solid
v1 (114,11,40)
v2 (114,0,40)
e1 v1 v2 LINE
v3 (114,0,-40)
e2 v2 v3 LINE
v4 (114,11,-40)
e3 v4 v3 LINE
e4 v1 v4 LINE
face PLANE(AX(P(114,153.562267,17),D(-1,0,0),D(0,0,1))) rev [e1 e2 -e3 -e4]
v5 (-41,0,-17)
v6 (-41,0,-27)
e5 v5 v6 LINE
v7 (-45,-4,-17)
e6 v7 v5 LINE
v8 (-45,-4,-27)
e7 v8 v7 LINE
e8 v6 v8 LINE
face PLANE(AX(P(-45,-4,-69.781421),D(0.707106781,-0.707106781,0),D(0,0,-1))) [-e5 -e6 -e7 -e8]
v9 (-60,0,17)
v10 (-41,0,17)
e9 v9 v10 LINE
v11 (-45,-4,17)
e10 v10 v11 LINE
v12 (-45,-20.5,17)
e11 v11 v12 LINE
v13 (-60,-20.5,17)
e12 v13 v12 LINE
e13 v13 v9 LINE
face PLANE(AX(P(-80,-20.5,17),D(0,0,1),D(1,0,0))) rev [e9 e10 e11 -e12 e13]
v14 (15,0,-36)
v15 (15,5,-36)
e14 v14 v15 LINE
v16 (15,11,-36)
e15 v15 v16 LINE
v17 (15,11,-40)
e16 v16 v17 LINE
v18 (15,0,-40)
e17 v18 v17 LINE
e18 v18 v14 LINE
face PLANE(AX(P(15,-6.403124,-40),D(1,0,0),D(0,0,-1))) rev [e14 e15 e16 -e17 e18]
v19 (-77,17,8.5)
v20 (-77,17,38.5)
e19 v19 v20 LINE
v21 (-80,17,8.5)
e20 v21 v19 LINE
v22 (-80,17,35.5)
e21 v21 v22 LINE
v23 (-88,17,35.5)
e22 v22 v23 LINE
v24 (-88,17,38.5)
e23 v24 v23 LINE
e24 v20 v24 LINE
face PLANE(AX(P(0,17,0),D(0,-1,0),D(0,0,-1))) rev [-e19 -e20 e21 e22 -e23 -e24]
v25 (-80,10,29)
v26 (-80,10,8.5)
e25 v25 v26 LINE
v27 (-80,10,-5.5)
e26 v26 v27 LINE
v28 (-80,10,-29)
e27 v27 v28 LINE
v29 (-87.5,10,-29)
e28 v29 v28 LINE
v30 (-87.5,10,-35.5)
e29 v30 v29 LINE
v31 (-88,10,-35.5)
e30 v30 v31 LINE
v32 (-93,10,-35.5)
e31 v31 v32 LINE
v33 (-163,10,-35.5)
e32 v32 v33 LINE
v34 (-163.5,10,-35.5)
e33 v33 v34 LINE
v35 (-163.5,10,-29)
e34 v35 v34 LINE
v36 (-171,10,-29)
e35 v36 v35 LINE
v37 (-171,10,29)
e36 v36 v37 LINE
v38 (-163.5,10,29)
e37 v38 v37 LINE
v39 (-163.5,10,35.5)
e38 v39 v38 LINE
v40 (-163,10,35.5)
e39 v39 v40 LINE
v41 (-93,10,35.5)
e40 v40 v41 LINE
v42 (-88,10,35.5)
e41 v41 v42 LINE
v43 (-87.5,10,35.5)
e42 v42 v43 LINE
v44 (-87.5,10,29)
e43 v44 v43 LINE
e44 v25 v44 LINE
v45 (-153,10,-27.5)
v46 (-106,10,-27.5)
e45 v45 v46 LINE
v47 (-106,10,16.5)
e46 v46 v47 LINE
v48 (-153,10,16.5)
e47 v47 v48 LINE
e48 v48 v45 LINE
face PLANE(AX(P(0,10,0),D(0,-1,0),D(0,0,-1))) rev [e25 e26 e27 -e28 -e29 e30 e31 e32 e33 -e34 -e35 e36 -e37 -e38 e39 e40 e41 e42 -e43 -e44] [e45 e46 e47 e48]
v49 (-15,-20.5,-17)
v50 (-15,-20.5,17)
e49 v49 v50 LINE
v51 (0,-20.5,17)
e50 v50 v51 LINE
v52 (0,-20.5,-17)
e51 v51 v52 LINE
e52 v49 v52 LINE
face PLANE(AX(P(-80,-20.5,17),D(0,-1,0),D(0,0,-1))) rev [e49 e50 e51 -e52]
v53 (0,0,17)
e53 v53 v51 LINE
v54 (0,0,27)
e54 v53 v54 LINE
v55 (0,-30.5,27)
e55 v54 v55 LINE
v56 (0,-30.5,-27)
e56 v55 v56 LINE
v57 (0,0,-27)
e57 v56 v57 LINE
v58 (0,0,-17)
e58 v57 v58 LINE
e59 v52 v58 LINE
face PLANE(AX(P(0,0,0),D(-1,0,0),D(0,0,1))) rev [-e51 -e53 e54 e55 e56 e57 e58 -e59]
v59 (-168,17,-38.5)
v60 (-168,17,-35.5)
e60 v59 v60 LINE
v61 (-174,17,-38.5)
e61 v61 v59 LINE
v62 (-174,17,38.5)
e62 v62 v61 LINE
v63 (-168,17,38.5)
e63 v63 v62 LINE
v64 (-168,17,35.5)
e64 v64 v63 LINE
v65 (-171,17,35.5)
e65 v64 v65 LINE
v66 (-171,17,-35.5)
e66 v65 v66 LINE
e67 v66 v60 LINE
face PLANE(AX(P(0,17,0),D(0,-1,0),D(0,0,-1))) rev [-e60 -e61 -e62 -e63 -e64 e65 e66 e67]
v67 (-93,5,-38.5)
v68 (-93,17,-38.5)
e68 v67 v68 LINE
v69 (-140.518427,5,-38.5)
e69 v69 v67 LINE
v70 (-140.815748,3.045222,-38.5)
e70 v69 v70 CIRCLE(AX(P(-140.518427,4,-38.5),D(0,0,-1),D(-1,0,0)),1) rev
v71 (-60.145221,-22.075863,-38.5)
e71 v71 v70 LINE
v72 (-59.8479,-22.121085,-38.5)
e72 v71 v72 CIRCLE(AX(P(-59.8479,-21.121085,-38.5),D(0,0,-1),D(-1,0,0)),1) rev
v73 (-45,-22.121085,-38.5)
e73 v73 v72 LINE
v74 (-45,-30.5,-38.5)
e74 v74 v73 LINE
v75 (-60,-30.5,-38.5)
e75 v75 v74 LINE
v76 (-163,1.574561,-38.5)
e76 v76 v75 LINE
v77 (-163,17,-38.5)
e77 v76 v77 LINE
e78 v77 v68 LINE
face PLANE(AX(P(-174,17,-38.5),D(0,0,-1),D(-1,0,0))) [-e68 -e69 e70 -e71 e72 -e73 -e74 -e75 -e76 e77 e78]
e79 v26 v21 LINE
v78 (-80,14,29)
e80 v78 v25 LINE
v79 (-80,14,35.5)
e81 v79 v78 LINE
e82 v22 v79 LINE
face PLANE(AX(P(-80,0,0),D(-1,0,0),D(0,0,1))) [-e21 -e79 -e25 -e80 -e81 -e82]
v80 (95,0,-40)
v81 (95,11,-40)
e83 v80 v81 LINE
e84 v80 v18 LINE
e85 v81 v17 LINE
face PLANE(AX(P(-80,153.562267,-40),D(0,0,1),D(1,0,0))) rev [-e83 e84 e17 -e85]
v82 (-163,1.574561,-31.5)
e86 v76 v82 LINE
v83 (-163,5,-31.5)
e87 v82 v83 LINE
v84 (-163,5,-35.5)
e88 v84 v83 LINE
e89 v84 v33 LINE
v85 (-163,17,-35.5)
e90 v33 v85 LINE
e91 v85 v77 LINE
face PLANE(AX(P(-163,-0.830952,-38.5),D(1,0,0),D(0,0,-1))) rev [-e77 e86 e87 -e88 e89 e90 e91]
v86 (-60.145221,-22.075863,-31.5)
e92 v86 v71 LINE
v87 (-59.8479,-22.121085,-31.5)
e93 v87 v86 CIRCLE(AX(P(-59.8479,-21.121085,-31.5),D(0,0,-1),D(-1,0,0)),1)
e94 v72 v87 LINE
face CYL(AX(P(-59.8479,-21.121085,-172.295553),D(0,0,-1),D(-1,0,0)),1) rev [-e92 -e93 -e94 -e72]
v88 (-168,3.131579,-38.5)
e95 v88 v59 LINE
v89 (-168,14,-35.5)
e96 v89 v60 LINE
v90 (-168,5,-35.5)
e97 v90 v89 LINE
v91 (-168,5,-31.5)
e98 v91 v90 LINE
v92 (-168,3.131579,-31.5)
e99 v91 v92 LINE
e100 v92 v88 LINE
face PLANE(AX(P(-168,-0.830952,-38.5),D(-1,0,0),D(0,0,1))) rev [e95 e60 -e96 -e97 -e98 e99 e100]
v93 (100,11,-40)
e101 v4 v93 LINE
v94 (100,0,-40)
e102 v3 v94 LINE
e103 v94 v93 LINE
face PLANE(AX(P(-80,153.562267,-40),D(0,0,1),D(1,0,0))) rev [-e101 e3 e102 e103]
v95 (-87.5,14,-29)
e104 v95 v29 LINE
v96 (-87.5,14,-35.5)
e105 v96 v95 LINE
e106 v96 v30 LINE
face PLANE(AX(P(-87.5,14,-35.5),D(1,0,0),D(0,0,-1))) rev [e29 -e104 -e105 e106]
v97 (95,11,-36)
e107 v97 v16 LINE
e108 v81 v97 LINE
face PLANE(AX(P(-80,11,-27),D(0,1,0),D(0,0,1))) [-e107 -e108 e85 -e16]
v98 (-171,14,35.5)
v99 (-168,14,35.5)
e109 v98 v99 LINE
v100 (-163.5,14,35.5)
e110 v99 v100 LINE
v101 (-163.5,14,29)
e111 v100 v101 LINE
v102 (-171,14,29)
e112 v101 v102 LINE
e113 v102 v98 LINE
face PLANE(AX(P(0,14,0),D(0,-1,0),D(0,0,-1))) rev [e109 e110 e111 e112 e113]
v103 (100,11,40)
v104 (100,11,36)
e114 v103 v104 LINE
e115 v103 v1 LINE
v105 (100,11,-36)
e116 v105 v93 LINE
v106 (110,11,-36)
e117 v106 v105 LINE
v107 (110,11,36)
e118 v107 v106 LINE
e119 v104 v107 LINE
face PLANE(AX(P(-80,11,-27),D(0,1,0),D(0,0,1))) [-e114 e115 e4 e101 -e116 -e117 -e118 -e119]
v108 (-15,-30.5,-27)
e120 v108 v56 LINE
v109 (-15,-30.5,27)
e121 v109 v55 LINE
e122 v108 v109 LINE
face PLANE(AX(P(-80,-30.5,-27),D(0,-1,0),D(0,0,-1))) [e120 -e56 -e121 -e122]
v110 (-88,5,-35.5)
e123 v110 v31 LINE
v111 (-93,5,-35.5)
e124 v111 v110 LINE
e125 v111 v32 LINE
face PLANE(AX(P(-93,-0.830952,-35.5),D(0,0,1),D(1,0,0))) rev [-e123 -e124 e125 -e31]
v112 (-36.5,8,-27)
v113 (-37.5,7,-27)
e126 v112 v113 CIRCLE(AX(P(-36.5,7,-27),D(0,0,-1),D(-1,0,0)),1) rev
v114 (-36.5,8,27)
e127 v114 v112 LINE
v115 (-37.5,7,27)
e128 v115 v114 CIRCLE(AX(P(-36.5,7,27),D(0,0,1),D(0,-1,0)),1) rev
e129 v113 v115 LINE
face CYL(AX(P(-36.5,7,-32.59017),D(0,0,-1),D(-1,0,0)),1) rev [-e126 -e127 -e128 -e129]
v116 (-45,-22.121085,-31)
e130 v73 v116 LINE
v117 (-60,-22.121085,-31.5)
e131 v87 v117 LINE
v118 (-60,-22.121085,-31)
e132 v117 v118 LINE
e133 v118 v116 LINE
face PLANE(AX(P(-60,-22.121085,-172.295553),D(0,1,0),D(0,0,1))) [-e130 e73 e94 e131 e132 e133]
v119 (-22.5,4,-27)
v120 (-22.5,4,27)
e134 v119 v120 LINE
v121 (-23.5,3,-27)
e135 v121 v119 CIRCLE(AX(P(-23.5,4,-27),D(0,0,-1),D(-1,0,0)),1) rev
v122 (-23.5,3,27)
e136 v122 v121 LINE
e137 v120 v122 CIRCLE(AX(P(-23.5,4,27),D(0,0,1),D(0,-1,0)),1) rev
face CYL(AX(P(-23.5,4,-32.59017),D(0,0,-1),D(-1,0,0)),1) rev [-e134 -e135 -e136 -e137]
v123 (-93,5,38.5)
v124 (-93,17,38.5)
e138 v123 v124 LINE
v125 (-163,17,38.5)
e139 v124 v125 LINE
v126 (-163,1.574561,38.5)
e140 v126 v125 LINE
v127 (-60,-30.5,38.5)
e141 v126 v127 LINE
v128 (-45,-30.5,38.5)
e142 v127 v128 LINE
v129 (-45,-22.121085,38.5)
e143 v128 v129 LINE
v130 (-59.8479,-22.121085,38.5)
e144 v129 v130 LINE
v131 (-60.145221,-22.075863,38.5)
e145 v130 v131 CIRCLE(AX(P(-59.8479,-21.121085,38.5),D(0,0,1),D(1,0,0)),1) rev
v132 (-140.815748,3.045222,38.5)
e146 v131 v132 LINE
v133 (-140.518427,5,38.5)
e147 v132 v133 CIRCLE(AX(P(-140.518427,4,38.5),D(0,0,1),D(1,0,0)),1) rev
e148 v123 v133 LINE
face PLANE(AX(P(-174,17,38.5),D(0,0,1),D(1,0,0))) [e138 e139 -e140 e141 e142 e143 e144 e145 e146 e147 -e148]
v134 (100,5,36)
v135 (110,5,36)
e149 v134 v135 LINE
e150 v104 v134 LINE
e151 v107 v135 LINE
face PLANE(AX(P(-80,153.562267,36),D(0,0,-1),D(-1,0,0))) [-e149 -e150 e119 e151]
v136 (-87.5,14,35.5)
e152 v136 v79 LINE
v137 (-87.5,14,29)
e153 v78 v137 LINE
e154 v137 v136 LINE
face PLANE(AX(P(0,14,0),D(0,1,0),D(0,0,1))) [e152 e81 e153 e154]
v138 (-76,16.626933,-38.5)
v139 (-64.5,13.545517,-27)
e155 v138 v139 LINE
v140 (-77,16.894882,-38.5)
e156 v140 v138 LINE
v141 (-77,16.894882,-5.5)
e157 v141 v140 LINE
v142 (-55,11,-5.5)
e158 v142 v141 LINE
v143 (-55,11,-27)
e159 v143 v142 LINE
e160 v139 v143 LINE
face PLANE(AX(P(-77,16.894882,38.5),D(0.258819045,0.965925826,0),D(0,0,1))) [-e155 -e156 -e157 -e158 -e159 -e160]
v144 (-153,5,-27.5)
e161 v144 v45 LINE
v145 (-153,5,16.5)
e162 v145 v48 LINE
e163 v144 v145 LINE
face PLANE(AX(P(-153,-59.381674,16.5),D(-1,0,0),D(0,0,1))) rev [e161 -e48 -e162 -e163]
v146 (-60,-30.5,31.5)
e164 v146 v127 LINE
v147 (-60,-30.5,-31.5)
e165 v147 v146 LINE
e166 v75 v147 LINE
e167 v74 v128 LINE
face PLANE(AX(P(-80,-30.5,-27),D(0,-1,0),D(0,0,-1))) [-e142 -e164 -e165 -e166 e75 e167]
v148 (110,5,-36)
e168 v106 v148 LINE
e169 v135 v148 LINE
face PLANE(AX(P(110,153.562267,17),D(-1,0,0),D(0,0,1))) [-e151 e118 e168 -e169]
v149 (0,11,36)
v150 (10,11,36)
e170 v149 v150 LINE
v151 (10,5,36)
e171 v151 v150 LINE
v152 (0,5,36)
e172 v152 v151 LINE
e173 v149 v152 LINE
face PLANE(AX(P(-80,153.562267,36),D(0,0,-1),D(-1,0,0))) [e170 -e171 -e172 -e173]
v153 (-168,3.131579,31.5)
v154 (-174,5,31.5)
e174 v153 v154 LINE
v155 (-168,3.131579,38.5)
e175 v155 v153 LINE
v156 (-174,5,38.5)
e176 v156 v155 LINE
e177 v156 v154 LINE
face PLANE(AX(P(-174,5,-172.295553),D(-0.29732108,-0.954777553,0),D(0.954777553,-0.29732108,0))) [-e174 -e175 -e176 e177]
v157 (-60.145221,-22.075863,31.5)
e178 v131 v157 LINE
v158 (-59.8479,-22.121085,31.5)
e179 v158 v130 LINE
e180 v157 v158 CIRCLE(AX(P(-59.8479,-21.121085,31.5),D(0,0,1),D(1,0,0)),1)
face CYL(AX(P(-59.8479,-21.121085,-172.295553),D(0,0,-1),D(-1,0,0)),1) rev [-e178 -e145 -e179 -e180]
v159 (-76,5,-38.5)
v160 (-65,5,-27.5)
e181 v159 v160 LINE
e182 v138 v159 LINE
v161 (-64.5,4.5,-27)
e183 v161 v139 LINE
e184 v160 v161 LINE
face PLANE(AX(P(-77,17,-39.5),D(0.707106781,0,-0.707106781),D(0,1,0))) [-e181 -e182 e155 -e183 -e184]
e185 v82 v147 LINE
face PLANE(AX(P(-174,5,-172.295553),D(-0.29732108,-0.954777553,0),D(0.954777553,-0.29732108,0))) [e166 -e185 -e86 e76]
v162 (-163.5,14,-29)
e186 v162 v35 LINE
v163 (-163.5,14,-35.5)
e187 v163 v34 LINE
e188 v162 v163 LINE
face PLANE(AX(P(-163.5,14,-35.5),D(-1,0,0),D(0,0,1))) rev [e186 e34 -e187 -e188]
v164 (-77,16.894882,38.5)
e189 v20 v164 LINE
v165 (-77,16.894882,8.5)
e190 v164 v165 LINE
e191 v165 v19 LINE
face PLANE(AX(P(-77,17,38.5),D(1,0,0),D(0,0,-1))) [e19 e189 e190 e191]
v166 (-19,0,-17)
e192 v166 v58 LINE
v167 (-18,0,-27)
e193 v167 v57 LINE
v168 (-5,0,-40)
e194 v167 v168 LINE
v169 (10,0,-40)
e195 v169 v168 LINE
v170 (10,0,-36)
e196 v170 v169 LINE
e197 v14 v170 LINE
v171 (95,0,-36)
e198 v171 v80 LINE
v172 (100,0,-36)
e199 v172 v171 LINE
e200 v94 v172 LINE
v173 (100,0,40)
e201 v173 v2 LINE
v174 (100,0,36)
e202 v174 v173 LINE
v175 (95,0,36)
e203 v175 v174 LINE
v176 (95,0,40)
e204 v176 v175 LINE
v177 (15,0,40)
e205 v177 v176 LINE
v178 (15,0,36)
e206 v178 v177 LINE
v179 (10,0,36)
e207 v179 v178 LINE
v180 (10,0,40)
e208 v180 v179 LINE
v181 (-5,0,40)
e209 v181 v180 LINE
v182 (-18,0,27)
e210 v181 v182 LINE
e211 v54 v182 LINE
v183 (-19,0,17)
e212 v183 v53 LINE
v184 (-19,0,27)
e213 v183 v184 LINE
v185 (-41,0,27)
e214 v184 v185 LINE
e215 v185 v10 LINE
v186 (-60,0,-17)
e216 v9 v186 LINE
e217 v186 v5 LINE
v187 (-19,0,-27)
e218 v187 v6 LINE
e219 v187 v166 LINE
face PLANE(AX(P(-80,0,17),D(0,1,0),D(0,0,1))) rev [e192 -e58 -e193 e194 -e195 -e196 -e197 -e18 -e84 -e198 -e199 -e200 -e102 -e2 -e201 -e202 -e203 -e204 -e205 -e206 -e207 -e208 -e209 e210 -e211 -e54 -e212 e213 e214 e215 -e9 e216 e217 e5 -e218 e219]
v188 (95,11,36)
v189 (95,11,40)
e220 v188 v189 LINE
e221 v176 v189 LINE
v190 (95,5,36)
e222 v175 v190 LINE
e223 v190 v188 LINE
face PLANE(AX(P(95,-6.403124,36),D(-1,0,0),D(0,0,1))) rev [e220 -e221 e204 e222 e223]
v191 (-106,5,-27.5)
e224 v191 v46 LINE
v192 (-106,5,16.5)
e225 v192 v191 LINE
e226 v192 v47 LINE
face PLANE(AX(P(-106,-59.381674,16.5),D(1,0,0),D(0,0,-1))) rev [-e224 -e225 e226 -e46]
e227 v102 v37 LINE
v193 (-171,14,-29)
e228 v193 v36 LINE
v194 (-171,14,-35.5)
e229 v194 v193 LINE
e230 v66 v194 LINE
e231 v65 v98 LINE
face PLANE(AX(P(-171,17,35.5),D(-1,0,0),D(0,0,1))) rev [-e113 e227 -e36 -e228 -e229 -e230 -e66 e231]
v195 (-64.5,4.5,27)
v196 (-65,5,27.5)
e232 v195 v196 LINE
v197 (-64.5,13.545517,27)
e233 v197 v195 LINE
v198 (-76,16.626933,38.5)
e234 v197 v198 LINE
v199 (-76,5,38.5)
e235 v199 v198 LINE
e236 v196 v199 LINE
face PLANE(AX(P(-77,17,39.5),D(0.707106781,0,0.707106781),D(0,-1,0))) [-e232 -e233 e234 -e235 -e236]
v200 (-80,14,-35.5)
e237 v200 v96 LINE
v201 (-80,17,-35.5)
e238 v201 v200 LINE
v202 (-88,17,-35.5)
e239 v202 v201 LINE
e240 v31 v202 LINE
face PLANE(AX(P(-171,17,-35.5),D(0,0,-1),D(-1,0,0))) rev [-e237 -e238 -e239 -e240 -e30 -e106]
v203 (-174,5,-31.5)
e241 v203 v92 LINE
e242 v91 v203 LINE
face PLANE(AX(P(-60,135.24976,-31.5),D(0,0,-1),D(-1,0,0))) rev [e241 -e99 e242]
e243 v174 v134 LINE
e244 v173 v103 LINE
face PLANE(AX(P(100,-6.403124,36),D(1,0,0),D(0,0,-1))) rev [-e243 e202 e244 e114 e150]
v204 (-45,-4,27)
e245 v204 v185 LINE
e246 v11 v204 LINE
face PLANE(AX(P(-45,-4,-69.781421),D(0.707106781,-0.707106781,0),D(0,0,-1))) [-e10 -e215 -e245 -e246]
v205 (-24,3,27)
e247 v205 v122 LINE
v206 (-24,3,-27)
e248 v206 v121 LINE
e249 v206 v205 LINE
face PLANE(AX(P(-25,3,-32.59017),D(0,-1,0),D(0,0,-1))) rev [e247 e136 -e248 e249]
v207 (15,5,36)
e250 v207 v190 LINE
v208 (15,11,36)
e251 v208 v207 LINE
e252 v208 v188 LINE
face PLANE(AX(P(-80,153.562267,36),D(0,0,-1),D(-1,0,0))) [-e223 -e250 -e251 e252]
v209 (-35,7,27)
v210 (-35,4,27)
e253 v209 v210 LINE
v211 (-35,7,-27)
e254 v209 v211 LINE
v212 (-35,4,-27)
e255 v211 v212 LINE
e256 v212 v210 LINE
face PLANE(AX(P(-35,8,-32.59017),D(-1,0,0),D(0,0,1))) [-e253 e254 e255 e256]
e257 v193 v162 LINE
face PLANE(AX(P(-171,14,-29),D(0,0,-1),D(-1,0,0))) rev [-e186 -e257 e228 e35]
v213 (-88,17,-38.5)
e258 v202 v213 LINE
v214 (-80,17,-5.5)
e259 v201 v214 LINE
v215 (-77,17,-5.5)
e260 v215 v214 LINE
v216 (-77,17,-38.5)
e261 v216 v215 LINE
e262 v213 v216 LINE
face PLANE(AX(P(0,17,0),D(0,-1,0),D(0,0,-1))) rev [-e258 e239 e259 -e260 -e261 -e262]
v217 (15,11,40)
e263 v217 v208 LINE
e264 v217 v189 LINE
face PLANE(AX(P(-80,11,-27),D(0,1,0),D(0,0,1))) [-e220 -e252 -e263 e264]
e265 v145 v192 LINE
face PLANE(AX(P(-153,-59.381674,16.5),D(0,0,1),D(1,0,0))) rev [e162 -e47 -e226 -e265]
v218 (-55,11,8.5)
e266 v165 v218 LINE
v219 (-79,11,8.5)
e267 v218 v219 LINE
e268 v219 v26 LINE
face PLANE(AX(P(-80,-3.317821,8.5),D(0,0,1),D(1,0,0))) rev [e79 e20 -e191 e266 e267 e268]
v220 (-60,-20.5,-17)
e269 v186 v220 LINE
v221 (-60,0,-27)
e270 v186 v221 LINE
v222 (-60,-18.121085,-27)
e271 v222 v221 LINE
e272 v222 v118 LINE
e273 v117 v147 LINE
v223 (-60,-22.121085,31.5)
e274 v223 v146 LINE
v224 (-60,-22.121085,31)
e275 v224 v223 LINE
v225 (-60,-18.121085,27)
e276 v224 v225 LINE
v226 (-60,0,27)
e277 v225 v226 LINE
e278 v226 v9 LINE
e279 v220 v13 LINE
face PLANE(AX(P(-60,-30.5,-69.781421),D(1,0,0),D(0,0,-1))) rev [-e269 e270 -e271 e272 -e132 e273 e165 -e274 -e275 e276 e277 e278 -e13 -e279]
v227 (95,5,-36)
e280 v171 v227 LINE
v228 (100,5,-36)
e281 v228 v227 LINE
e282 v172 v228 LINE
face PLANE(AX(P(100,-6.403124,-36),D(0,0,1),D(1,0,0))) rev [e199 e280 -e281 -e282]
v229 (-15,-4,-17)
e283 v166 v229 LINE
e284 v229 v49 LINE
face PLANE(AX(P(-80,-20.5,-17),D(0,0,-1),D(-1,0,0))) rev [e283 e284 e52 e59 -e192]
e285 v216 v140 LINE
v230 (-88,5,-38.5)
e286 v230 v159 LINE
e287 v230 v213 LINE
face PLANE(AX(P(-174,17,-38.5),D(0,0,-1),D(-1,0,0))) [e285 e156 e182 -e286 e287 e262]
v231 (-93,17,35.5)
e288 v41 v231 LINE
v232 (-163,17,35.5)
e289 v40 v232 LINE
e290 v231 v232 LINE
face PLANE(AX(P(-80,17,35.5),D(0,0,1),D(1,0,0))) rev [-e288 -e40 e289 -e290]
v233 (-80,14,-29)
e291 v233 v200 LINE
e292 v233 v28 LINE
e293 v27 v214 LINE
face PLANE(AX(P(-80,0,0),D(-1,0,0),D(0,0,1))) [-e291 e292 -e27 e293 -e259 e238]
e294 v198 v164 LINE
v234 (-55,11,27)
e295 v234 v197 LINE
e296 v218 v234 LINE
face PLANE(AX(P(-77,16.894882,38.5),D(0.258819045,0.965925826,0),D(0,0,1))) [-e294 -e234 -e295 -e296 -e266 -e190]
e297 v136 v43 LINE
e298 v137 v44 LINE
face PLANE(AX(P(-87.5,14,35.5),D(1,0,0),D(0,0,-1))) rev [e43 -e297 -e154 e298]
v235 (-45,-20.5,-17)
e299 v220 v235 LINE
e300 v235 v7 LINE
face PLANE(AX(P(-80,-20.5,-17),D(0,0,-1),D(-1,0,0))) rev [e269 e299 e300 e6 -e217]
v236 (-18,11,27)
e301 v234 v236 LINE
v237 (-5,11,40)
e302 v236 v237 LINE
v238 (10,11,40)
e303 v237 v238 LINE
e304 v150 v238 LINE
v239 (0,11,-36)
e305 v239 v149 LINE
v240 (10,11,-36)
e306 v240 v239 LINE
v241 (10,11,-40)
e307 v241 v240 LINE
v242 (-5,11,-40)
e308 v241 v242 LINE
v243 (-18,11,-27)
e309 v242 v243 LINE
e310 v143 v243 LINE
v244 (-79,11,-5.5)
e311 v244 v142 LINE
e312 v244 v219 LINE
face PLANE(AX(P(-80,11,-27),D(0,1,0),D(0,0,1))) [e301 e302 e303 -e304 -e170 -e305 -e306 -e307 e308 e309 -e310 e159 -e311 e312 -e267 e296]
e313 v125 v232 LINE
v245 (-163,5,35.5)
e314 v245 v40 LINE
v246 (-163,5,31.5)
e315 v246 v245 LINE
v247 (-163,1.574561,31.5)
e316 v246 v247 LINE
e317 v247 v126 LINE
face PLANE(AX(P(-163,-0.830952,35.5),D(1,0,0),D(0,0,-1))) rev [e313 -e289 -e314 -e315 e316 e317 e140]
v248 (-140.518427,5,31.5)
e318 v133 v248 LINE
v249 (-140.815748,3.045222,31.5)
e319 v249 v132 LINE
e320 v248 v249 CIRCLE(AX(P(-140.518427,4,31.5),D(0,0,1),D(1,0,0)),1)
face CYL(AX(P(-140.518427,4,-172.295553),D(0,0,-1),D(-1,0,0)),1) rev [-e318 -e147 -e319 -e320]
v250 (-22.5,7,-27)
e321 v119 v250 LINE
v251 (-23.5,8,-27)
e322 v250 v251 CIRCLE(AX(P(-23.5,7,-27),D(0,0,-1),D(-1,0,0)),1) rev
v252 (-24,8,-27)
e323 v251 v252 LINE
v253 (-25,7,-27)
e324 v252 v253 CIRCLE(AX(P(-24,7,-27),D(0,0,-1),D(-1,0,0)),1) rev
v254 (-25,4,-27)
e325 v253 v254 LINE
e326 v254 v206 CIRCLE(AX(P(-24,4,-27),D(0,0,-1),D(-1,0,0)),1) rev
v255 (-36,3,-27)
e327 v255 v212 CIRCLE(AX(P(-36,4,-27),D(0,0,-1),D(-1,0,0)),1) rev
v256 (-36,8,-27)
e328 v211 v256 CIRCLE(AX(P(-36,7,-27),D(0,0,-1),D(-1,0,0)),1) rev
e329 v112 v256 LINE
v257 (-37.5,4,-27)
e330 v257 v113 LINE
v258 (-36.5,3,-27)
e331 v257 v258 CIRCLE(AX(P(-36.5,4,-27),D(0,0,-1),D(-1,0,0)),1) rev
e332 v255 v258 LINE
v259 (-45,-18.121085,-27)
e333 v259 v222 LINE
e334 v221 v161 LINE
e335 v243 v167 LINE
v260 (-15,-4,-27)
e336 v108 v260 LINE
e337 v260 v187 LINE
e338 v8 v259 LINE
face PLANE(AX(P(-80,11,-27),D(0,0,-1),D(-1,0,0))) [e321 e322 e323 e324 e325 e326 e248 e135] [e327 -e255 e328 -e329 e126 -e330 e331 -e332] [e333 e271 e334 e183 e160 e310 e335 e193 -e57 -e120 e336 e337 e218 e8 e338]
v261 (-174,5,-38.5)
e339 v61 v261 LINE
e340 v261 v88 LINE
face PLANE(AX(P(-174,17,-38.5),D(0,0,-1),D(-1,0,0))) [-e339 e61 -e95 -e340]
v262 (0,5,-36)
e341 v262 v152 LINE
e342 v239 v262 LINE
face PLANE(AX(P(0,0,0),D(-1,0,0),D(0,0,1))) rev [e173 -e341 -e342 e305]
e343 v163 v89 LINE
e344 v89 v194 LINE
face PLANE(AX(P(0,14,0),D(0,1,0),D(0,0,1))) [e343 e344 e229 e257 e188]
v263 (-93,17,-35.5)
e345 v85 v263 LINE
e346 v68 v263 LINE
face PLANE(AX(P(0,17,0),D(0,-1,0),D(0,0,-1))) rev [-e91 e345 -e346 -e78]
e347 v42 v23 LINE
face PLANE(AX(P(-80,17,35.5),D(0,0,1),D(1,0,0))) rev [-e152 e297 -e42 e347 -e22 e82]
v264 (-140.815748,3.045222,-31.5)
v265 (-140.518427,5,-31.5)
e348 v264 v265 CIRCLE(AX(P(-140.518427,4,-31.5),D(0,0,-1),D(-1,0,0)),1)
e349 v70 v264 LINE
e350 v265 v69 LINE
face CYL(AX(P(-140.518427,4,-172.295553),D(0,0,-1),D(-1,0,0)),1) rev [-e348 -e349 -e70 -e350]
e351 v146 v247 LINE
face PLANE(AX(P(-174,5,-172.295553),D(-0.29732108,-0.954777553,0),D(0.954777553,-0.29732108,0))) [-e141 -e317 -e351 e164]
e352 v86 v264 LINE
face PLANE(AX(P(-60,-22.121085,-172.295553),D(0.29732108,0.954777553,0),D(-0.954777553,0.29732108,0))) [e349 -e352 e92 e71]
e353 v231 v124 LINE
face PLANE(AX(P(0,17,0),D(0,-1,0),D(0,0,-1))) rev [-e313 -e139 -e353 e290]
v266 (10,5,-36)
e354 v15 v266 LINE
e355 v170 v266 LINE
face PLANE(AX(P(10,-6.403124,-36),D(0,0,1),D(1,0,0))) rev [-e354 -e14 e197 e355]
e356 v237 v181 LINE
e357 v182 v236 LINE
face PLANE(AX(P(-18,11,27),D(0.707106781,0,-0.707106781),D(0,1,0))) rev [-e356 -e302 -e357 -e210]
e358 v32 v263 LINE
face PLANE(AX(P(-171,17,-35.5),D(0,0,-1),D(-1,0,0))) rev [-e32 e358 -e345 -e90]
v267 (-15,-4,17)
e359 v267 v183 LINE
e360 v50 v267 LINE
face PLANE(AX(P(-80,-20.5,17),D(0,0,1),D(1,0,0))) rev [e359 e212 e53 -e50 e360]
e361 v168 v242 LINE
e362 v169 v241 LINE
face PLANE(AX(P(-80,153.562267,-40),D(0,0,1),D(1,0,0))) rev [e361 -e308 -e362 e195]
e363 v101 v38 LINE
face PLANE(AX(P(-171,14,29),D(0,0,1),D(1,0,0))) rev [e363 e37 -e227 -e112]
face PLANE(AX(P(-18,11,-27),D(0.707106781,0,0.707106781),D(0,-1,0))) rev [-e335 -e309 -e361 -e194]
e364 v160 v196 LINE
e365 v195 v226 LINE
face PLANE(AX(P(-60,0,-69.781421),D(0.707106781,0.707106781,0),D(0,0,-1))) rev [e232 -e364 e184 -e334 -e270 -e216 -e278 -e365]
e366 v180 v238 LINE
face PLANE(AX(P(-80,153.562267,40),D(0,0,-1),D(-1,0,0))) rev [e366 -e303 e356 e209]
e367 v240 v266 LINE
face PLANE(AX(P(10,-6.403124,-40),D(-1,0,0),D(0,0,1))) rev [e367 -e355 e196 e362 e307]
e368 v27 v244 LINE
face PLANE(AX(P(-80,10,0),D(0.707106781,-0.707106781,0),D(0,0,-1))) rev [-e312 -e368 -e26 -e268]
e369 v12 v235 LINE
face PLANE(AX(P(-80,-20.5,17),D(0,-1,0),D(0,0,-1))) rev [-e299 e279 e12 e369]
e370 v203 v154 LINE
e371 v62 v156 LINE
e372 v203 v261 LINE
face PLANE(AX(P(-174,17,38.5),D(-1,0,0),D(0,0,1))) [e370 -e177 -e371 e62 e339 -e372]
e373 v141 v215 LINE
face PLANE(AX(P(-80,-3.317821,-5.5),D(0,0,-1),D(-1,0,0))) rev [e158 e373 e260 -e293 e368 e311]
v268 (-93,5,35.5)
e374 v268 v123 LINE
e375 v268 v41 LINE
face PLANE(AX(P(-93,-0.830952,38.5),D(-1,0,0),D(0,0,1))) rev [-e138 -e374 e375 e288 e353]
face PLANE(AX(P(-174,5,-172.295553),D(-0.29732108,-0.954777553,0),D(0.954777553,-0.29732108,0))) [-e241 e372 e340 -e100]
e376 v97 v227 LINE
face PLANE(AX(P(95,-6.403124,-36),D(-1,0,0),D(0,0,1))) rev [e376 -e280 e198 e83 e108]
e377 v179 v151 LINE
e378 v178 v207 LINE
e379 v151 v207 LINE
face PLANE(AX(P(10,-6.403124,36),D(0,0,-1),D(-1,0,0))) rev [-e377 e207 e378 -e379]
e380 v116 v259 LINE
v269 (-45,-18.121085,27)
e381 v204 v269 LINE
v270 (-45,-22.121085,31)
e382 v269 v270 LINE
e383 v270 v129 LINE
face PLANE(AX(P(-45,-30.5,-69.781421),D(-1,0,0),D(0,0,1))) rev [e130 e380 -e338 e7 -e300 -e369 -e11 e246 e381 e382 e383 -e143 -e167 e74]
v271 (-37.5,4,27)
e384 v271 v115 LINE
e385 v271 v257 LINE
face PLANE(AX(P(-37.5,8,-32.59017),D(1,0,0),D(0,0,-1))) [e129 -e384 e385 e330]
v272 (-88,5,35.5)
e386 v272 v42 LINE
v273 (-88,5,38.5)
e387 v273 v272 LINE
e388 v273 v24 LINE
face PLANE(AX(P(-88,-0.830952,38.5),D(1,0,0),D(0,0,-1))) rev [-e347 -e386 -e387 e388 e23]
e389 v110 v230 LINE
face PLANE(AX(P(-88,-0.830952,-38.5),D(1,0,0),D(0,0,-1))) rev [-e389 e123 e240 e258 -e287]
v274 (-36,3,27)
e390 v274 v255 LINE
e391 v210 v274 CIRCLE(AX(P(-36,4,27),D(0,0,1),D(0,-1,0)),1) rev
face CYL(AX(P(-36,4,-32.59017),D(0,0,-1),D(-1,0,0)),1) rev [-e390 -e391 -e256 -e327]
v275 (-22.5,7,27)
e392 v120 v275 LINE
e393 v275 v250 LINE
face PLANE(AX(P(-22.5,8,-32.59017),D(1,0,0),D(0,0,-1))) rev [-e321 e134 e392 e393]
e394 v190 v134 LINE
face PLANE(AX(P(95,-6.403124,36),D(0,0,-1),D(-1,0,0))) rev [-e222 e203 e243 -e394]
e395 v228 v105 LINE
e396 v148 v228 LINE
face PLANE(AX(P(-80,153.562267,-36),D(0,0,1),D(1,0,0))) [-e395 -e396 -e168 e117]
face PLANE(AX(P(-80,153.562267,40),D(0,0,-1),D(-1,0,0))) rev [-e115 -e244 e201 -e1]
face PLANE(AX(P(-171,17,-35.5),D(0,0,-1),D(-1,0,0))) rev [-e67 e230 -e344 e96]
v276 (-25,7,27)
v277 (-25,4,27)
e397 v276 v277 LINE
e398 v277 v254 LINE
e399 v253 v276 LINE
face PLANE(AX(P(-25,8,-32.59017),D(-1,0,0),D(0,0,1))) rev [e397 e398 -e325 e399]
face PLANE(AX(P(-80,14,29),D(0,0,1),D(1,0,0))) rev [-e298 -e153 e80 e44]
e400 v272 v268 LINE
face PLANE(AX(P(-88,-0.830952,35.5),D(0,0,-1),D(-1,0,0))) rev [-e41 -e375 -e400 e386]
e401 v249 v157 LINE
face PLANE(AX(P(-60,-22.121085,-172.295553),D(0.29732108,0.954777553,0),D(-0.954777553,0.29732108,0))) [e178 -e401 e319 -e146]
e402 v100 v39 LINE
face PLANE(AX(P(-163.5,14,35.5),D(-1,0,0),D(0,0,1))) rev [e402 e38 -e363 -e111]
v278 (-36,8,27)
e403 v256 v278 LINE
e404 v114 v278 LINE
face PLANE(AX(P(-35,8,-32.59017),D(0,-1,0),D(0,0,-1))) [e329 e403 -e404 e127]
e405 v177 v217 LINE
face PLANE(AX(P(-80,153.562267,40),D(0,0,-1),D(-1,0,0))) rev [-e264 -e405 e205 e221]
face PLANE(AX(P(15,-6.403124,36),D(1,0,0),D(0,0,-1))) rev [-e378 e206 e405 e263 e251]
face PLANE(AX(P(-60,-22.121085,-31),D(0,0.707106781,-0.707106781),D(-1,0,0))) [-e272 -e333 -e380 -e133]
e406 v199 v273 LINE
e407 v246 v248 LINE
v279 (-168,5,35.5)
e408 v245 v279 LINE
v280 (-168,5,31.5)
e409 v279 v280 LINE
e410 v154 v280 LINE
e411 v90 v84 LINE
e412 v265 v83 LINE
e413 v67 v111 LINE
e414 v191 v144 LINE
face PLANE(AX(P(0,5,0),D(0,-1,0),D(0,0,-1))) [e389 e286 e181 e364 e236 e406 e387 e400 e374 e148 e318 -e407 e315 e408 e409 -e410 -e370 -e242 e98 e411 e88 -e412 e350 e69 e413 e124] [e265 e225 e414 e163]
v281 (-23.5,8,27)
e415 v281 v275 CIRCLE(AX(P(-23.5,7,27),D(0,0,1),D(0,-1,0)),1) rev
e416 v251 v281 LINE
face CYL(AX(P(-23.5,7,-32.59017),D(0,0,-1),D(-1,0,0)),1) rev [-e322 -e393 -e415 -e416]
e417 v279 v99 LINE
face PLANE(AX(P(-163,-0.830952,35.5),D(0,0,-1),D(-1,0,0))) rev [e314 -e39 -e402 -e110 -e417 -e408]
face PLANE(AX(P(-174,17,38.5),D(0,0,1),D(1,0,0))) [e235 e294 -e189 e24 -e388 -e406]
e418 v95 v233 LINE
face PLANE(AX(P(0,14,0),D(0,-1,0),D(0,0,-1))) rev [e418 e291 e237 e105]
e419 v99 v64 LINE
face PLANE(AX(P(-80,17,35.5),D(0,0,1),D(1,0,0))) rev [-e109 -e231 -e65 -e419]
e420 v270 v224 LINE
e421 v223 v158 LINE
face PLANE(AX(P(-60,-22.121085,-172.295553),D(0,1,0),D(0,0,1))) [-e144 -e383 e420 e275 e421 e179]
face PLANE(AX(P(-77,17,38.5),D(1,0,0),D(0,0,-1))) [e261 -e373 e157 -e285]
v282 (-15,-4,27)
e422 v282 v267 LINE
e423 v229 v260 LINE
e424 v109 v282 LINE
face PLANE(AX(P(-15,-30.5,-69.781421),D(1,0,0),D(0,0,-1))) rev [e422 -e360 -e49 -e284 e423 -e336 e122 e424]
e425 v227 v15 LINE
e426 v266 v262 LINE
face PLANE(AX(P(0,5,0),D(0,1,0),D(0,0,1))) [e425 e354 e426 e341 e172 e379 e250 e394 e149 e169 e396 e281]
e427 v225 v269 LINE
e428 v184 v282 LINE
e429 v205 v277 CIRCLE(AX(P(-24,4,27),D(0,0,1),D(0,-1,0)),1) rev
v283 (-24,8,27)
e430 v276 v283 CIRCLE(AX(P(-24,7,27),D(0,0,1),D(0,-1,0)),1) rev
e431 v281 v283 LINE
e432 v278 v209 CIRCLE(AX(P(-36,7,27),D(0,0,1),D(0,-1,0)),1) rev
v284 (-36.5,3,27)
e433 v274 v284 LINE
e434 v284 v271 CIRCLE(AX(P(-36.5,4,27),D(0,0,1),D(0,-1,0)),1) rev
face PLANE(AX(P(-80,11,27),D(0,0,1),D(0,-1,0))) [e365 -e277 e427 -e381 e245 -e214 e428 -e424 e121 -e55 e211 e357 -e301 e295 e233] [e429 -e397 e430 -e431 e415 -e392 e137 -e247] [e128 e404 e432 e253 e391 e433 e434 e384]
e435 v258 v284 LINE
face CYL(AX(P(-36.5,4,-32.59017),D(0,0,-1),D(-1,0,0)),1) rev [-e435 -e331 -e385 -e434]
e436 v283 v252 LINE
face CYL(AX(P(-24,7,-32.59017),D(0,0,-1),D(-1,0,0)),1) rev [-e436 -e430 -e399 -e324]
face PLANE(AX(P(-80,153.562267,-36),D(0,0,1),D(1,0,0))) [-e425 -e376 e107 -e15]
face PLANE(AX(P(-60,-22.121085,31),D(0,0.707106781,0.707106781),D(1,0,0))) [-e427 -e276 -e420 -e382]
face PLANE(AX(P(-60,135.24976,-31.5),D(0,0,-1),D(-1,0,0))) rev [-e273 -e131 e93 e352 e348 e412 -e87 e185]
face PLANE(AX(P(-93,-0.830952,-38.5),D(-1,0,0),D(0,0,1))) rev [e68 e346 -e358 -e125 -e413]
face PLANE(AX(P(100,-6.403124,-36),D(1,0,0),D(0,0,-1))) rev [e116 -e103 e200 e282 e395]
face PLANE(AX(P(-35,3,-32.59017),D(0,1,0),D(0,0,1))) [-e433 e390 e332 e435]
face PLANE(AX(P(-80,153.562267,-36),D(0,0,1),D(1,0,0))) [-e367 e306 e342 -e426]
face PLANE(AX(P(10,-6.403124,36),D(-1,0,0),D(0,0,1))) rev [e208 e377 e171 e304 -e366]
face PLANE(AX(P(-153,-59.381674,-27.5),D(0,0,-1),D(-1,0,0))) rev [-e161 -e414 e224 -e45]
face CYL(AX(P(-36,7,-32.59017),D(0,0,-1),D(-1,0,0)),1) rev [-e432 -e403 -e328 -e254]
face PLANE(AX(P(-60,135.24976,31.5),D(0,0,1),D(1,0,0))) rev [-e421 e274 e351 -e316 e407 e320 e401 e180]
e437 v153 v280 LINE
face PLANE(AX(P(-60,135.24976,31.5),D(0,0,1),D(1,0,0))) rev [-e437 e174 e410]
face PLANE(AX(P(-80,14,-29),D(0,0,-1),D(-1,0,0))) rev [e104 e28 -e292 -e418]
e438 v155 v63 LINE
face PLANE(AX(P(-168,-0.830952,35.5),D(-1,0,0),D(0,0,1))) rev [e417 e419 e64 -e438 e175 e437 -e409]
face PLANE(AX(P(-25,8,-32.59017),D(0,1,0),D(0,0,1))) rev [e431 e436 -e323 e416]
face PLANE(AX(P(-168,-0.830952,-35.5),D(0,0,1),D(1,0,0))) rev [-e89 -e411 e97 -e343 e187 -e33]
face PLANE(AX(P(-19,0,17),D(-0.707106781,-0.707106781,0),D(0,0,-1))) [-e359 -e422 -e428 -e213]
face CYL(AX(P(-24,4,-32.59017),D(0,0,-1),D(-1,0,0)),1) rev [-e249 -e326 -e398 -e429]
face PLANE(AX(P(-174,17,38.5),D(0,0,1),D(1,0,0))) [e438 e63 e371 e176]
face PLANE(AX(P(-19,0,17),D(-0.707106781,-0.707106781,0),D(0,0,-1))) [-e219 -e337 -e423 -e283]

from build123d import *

# Parameters (mm, degrees)
SKETCH2_W            = 54
SKETCH2_H            = 41.5
SKETCH2_W_2          = 34
SKETCH2_H_2          = 20.5
BOSS_EXTRUDE1_DEPTH  = 80
CUT_EXTRUDE2_REACH   = 103.224
SKETCH4_W            = 30
SKETCH4_H            = 30.5
SKETCH4_W_2          = 20
SKETCH7_W            = 91
SKETCH7_H            = 71
BOSS_EXTRUDE2_DEPTH  = 5
SKETCH8_W            = 47
SKETCH8_H            = 44
CUT_EXTRUDE3_DEPTH   = 6
SKETCH10_W           = 97
SKETCH10_H           = 77
BOSS_EXTRUDE3_DEPTH  = 12
SKETCH11_W           = 7.5
SKETCH11_H           = 6.5
BOSS_EXTRUDE4_DEPTH  = 4
SKETCH12_W           = 3
SKETCH12_H           = 14
CUT_EXTRUDE5_DEPTH   = 6
SKETCH13_W           = 2.5
SKETCH13_H           = 5
CUT_EXTRUDE6_DEPTH   = 54
BOSS_EXTRUDE5_REACH  = 194.705
CUT_EXTRUDE8_REACH   = 186.43
SKETCH18_W           = 114
SKETCH18_H           = 63
CHAMFER2_SIZE        = 5
FILLET1_R            = 1
CHAMFER3_SIZE        = 4
CHAMFER4_SIZE        = 12.5
FILLET2_R            = 1
CHAMFER5_SIZE        = 1
FILLET2_OF_MIRROR1_R = 1
BOSS_EXTRUDE6_START  = -5
SKETCH19_W           = 110
SKETCH19_H           = 72
BOSS_EXTRUDE6_DEPTH  = 5
BOSS_EXTRUDE7_START  = -5
SKETCH21_W           = 118
SKETCH21_H           = 80
BOSS_EXTRUDE7_DEPTH  = 11
CHAMFER7_SIZE        = 14
CUT_EXTRUDE9_REACH   = 185.298
SKETCH22_W           = 5
SKETCH22_H           = 4
CUT_EXTRUDE10_START  = -12
SKETCH23_W           = 5
SKETCH23_H           = 3
CUT_EXTRUDE10_DEPTH  = 12
CUT_EXTRUDE11_REACH  = 184.034
SKETCH24_W           = 5
SKETCH24_H           = 77
CHAMFER8_SIZE        = 22
CHAMFER8_SIZE2       = 5.894882233


# Some blends are built 0.0001 mm under size
with BuildPart() as part:
    # Sketch2 → Boss-Extrude1 (new body)
    with BuildSketch(Plane(origin=(0, 0, 0), x_dir=(0, 0, -1), z_dir=(1, 0, 0))):
        with Locations((0, -9.75)):
            Rectangle(SKETCH2_W, SKETCH2_H)
        with Locations((0, -10.25)):
            Rectangle(SKETCH2_W_2, SKETCH2_H_2, mode=Mode.SUBTRACT)
    extrude(amount=-BOSS_EXTRUDE1_DEPTH)

    # Cut-Extrude2: up to this face of the body (flat: up to its plane)
    cut_extrude2_end = Plane(part.part.faces().sort_by_distance((-40, -9.75, -27))[0])
    # Sketch4 → Cut-Extrude2 (cut, up to the picked face)
    with BuildSketch(Plane.XY.offset(27), mode=Mode.PRIVATE) as cut_extrude2_sk1:
        with Locations((-30, -15.25)):
            Rectangle(SKETCH4_W, SKETCH4_H)
    cut_extrude2_tool1 = split(extrude(cut_extrude2_sk1.sketch, amount=-CUT_EXTRUDE2_REACH, mode=Mode.PRIVATE), bisect_by=cut_extrude2_end, keep=Keep.BOTH, mode=Mode.PRIVATE)
    # Sketch4 → Cut-Extrude2 (cut, up to the picked face)
    with BuildSketch(Plane.XY.offset(27), mode=Mode.PRIVATE) as cut_extrude2_sk2:
        with Locations((-70, -15.25)):
            Rectangle(SKETCH4_W_2, SKETCH4_H)
    cut_extrude2_tool2 = split(extrude(cut_extrude2_sk2.sketch, amount=-CUT_EXTRUDE2_REACH, mode=Mode.PRIVATE), bisect_by=cut_extrude2_end, keep=Keep.BOTH, mode=Mode.PRIVATE)
    add(cut_extrude2_tool1.solids().sort_by(Axis((-30, -15.25, 27), (0, 0, -1)))[0], mode=Mode.SUBTRACT)
    add(cut_extrude2_tool2.solids().sort_by(Axis((-70, -15.25, 27), (0, 0, -1)))[0], mode=Mode.SUBTRACT)

    # Sketch7 → Boss-Extrude2 (add)
    with BuildSketch(Plane(origin=(0, 5, 0), x_dir=(1, 0, 0), z_dir=(0, 1, 0))):
        with Locations((-125.5, 0)):
            Rectangle(SKETCH7_W, SKETCH7_H)
    extrude(amount=BOSS_EXTRUDE2_DEPTH)

    # Sketch8 → Cut-Extrude3 (cut)
    with BuildSketch(Plane(origin=(0, 11, 0), x_dir=(1, 0, 0), z_dir=(0, 1, 0))):
        with Locations((-129.5, 5.5)):
            Rectangle(SKETCH8_W, SKETCH8_H)
    extrude(amount=-CUT_EXTRUDE3_DEPTH, mode=Mode.SUBTRACT)

    # Sketch10 → Boss-Extrude3 (add)
    with BuildSketch(Plane.XZ.offset(-5)):
        with Locations((-125.5, 0)):
            Rectangle(SKETCH10_W, SKETCH10_H)
        Polygon((-80, 27), (-80, 35.5), (-171, 35.5), (-171, -35.5), (-80, -35.5), (-80, -27), align=None, mode=Mode.SUBTRACT)
    extrude(amount=-BOSS_EXTRUDE3_DEPTH)

    # Sketch11 → Boss-Extrude4 (add)
    with BuildSketch(Plane(origin=(0, 10, 0), x_dir=(1, 0, 0), z_dir=(0, 1, 0))):
        with Locations((-167.25, -32.25)):
            Rectangle(SKETCH11_W, SKETCH11_H)
        with Locations((-83.75, -32.25)):
            Rectangle(SKETCH11_W, SKETCH11_H)
        with Locations((-83.75, 32.25)):
            Rectangle(SKETCH11_W, SKETCH11_H)
        with Locations((-167.25, 32.25)):
            Rectangle(SKETCH11_W, SKETCH11_H)
    extrude(amount=BOSS_EXTRUDE4_DEPTH)

    # Sketch12 → Cut-Extrude5 (cut)
    with BuildSketch(Plane(origin=(0, 17, 0), x_dir=(1, 0, 0), z_dir=(0, 1, 0))):
        with Locations((-78.5, -1.5)):
            Rectangle(SKETCH12_W, SKETCH12_H)
    extrude(amount=-CUT_EXTRUDE5_DEPTH, mode=Mode.SUBTRACT)

    # Sketch13 → Cut-Extrude6 (cut)
    with BuildSketch(Plane.XY.offset(27)):
        with Locations((-23.75, 5.5)):
            Rectangle(SKETCH13_W, SKETCH13_H)
    cut_extrude6 = extrude(amount=-CUT_EXTRUDE6_DEPTH, mode=Mode.SUBTRACT)

    # Boss-Extrude5: up to this face of the body (flat: up to its plane)
    boss_extrude5_end = Plane(part.part.faces().sort_by_distance((-125.5, 11, -38.5))[0])
    # Sketch15 → Boss-Extrude5 (add, up to the picked face)
    with BuildSketch(Plane.XY.offset(38.5), mode=Mode.PRIVATE) as boss_extrude5_sk1:
        Polygon((-174, 5), (-60, -30.5), (-45, -30.5), (-45, -22.121084957), (-60, -22.121084957), (-147.093061552, 5), align=None)
    boss_extrude5_tool1 = split(extrude(boss_extrude5_sk1.sketch, amount=-BOSS_EXTRUDE5_REACH, mode=Mode.PRIVATE), bisect_by=boss_extrude5_end, keep=Keep.BOTH, mode=Mode.PRIVATE)
    add(boss_extrude5_tool1.solids().sort_by(Axis((-103.034337, -12.768903, 38.5), (0, 0, -1)))[0])

    # Cut-Extrude8: up to this face of the body (flat: up to its plane)
    cut_extrude8_end = Plane(part.part.faces().sort_by_distance((-105.982216644, 5, 2.901755115))[0])
    # Sketch18 → Cut-Extrude8 (cut, up to the picked face)
    with BuildSketch(Plane.XZ.offset(30.5), mode=Mode.PRIVATE) as cut_extrude8_sk1:
        with Locations((-117, 0)):
            Rectangle(SKETCH18_W, SKETCH18_H)
    cut_extrude8_tool1 = split(extrude(cut_extrude8_sk1.sketch, amount=-CUT_EXTRUDE8_REACH, mode=Mode.PRIVATE), bisect_by=cut_extrude8_end, keep=Keep.BOTH, mode=Mode.PRIVATE)
    add(cut_extrude8_tool1.solids().sort_by(Axis((-117, -30.5, 0), (0, 1, 0)))[0], mode=Mode.SUBTRACT)

    # Chamfer2
    chamfer2_edges = [part.edges().sort_by_distance(p)[0] for p in [
        (-60, 5, 0),
    ]]
    chamfer(chamfer2_edges, length=CHAMFER2_SIZE - 0.0001)  # a hair under: the kernel refuses the full size

    # Fillet1
    fillet1_edges = [part.edges().sort_by_distance(p)[0] for p in [
        (-60, -22.121084957, -35),
        (-147.093061552, 5, -35),
        (-147.093061552, 5, 35),
        (-60, -22.121084957, 35),
    ]]
    fillet(fillet1_edges, radius=FILLET1_R)

    # Chamfer3
    chamfer3_edges = [part.edges().sort_by_distance(p)[0] for p in [
        (-52.5, -22.121084957, 27),
        (-52.5, -22.121084957, -27),
        (-45, 0, 22),
        (-45, 0, -22),
        (-15, 0, 22),
        (-15, 0, -22),
    ]]
    chamfer(chamfer3_edges, length=CHAMFER3_SIZE)

    # Chamfer4
    # the kernel refuses this chamfer: 12.5 mm, written as the material it adds along each edge
    with BuildSketch(Plane(origin=(-77, 11, 27), x_dir=(-0.027495876610586587, 0, 0.9996219169112966), z_dir=(0, -1, 0))) as chamfer4_piece_1_section:
        Polygon((CHAMFER4_SIZE * 0.999621916911, -CHAMFER4_SIZE * 0.0274958766106), (-CHAMFER4_SIZE * 0.0274958766106, -CHAMFER4_SIZE * 0.999621916911), (0, 0), align=None)
    chamfer4_piece_1 = extrude(amount=6, mode=Mode.PRIVATE)
    chamfer4_piece_1 = split(chamfer4_piece_1, bisect_by=Plane(origin=(-68.359552988, 8.359652988, 28.292902516), z_dir=(0.7071067811865472, 0.7071067811865478, 0)), keep=Keep.TOP, mode=Mode.PRIVATE)
    add(chamfer4_piece_1)
    with BuildSketch(Plane(origin=(-77, 11, 27), x_dir=(-0.027495876610586587, 0, 0.9996219169112966), z_dir=(0, -1, 0))) as chamfer4_piece_2_section:
        Polygon((CHAMFER4_SIZE * 0.999621916911, -CHAMFER4_SIZE * 0.0274958766106), (-CHAMFER4_SIZE * 0.0274958766106, -CHAMFER4_SIZE * 0.999621916911), (0, 0), align=None)
    chamfer4_piece_2 = extrude(amount=38.14603735, mode=Mode.PRIVATE)
    chamfer4_piece_2 = split(chamfer4_piece_2, bisect_by=Plane(origin=(-64.503738194, 5, 26.714487269), z_dir=(0, -1, 0)), keep=Keep.TOP, mode=Mode.PRIVATE)
    chamfer4_piece_2 = split(chamfer4_piece_2, bisect_by=Plane(origin=(-64.627778646, 4.627878646, 26.714487269), z_dir=(0.7071067811865472, 0.7071067811865478, 0)), keep=Keep.TOP, mode=Mode.PRIVATE)
    add(chamfer4_piece_2)
    with BuildSketch(Plane(origin=(-77, 11, 27), x_dir=(-0.027495876610586587, 0, 0.9996219169112966), z_dir=(0, -1, 0))) as chamfer4_piece_3_section:
        Polygon((CHAMFER4_SIZE * 0.999621916911, -CHAMFER4_SIZE * 0.0274958766106), (-CHAMFER4_SIZE * 0.0274958766106, -CHAMFER4_SIZE * 0.999621916911), (0, 0), align=None)
    chamfer4_piece_3 = extrude(amount=6, mode=Mode.PRIVATE)
    chamfer4_piece_3 = split(chamfer4_piece_3, bisect_by=Plane(origin=(-73.477032912, 7.846772168, 38.5), z_dir=(0, 0, -1)), keep=Keep.TOP, mode=Mode.PRIVATE)
    chamfer4_piece_3 = split(chamfer4_piece_3, bisect_by=Plane(origin=(-70.66185254, 10.66195254, 31.346666283), z_dir=(-0.7071067811865472, -0.7071067811865478, 0)), keep=Keep.TOP, mode=Mode.PRIVATE)
    add(chamfer4_piece_3)
    with BuildSketch(Plane(origin=(-77, -27.14603735, -27), x_dir=(-0.027495876610586587, 0, -0.9996219169112966), z_dir=(0, 1, 0))) as chamfer4_piece_4_section:
        Polygon((CHAMFER4_SIZE * 0.999621916911, -CHAMFER4_SIZE * 0.0274958766106), (-CHAMFER4_SIZE * 0.0274958766106, -CHAMFER4_SIZE * 0.999621916911), (0, 0), align=None)
    chamfer4_piece_4 = extrude(amount=38.14603735, mode=Mode.PRIVATE)
    chamfer4_piece_4 = split(chamfer4_piece_4, bisect_by=Plane(origin=(-64.627778646, 4.627878646, -26.714487269), z_dir=(0.7071067811865472, 0.7071067811865478, 0)), keep=Keep.TOP, mode=Mode.PRIVATE)
    chamfer4_piece_4 = split(chamfer4_piece_4, bisect_by=Plane(origin=(-64.503738194, 5, -26.714487269), z_dir=(0, -1, 0)), keep=Keep.TOP, mode=Mode.PRIVATE)
    add(chamfer4_piece_4)
    with BuildSketch(Plane(origin=(-77, 5, -27), x_dir=(-0.027495876610586587, 0, -0.9996219169112966), z_dir=(0, 1, 0))) as chamfer4_piece_5_section:
        Polygon((CHAMFER4_SIZE * 0.999621916911, -CHAMFER4_SIZE * 0.0274958766106), (-CHAMFER4_SIZE * 0.0274958766106, -CHAMFER4_SIZE * 0.999621916911), (0, 0), align=None)
    chamfer4_piece_5 = extrude(amount=6, mode=Mode.PRIVATE)
    chamfer4_piece_5 = split(chamfer4_piece_5, bisect_by=Plane(origin=(-73.477032912, 7.846772168, -38.5), z_dir=(0, 0, 1)), keep=Keep.TOP, mode=Mode.PRIVATE)
    chamfer4_piece_5 = split(chamfer4_piece_5, bisect_by=Plane(origin=(-70.66185254, 10.66195254, -31.346666283), z_dir=(-0.7071067811865472, -0.7071067811865478, 0)), keep=Keep.TOP, mode=Mode.PRIVATE)
    add(chamfer4_piece_5)
    with BuildSketch(Plane(origin=(-77, 5, -27), x_dir=(-0.027495876610586587, 0, -0.9996219169112966), z_dir=(0, 1, 0))) as chamfer4_piece_6_section:
        Polygon((CHAMFER4_SIZE * 0.999621916911, -CHAMFER4_SIZE * 0.0274958766106), (-CHAMFER4_SIZE * 0.0274958766106, -CHAMFER4_SIZE * 0.999621916911), (0, 0), align=None)
    chamfer4_piece_6 = extrude(amount=6, mode=Mode.PRIVATE)
    chamfer4_piece_6 = split(chamfer4_piece_6, bisect_by=Plane(origin=(-68.359552988, 8.359652988, -28.292902516), z_dir=(0.7071067811865472, 0.7071067811865478, 0)), keep=Keep.TOP, mode=Mode.PRIVATE)
    add(chamfer4_piece_6)

    # Fillet2
    fillet2_edges = [part.edges().sort_by_distance(p)[0] for p in [
        (-22.5, 3, 0),
        (-22.5, 8, 0),
        (-25, 8, 0),
        (-25, 3, 0),
    ]]
    fillet(fillet2_edges, radius=FILLET2_R)

    # Chamfer5
    chamfer5_edges = [part.edges().sort_by_distance(p)[0] for p in [
        (-80, 11, 1.5),
    ]]
    chamfer(chamfer5_edges, length=CHAMFER5_SIZE - 0.0001)  # a hair under: the kernel refuses the full size

    # Mirror1: Cut-Extrude6 across plane
    add(cut_extrude6.mirror(Plane(origin=(-30, 0, 0), x_dir=(0, 0, 1), z_dir=(1, 0, 0))), mode=Mode.SUBTRACT)

    # Fillet2 of Mirror1
    fillet2_of_mirror1_edges = [part.edges().sort_by_distance(p)[0] for p in [
        (-37.5, 3, 0),
        (-37.5, 8, 0),
        (-35, 8, 0),
        (-35, 3, 0),
    ]]
    fillet(fillet2_of_mirror1_edges, radius=FILLET2_OF_MIRROR1_R)

    # Sketch19 → Boss-Extrude6 (add)
    with BuildSketch(Plane(origin=(0, 5, 0), x_dir=(1, 0, 0), z_dir=(0, 1, 0)).offset(BOSS_EXTRUDE6_START)):
        with Locations((55, 0)):
            Rectangle(SKETCH19_W, SKETCH19_H)
    extrude(amount=BOSS_EXTRUDE6_DEPTH)

    # Sketch21 → Boss-Extrude7 (add)
    with BuildSketch(Plane(origin=(0, 5, 0), x_dir=(1, 0, 0), z_dir=(0, 1, 0)).offset(BOSS_EXTRUDE7_START)):
        with Locations((55, 0)):
            Rectangle(SKETCH21_W, SKETCH21_H)
        Polygon((0, 36), (0, 27), (0, -27), (0, -36), (110, -36), (110, 36), align=None, mode=Mode.SUBTRACT)
    extrude(amount=BOSS_EXTRUDE7_DEPTH)

    # Chamfer7
    # the kernel refuses this chamfer: 14 mm, written as the material it adds along each edge
    with BuildSketch(Plane(origin=(-4, 0, -27), x_dir=(-0.9996219169112968, 0, 0.02749587661058612), z_dir=(0, 1, 0))) as chamfer7_piece_1_section:
        Polygon((CHAMFER7_SIZE * 0.999621916911, -CHAMFER7_SIZE * 0.0274958766106), (-CHAMFER7_SIZE * 0.0274958766106, -CHAMFER7_SIZE * 0.999621916911), (0, 0), align=None)
    chamfer7_piece_1 = extrude(amount=11, mode=Mode.PRIVATE)
    chamfer7_piece_1 = split(chamfer7_piece_1, bisect_by=Plane(origin=(-16, 5.5, -40), z_dir=(0, 0, 1)), keep=Keep.TOP, mode=Mode.PRIVATE)
    add(chamfer7_piece_1)
    with BuildSketch(Plane(origin=(-4, 11, 27), x_dir=(-0.9996219169112968, 0, -0.02749587661058612), z_dir=(0, -1, 0))) as chamfer7_piece_2_section:
        Polygon((CHAMFER7_SIZE * 0.999621916911, -CHAMFER7_SIZE * 0.0274958766106), (-CHAMFER7_SIZE * 0.0274958766106, -CHAMFER7_SIZE * 0.999621916911), (0, 0), align=None)
    chamfer7_piece_2 = extrude(amount=11, mode=Mode.PRIVATE)
    chamfer7_piece_2 = split(chamfer7_piece_2, bisect_by=Plane(origin=(-16, 5.5, 40), z_dir=(0, 0, -1)), keep=Keep.TOP, mode=Mode.PRIVATE)
    add(chamfer7_piece_2)

    # Cut-Extrude9: up to this face of the body (flat: up to its plane)
    cut_extrude9_end = Plane(part.part.faces().sort_by_distance((37.275205199, 0, 0))[0])
    # Sketch22 → Cut-Extrude9 (cut, up to the picked face)
    with BuildSketch(Plane(origin=(0, 11, 0), x_dir=(1, 0, 0), z_dir=(0, 1, 0)), mode=Mode.PRIVATE) as cut_extrude9_sk1:
        with Locations((97.5, 38)):
            Rectangle(SKETCH22_W, SKETCH22_H)
    cut_extrude9_tool1 = split(extrude(cut_extrude9_sk1.sketch, amount=-CUT_EXTRUDE9_REACH, mode=Mode.PRIVATE), bisect_by=cut_extrude9_end, keep=Keep.BOTH, mode=Mode.PRIVATE)
    # Sketch22 → Cut-Extrude9 (cut, up to the picked face)
    with BuildSketch(Plane(origin=(0, 11, 0), x_dir=(1, 0, 0), z_dir=(0, 1, 0)), mode=Mode.PRIVATE) as cut_extrude9_sk2:
        with Locations((97.5, -38)):
            Rectangle(SKETCH22_W, SKETCH22_H)
    cut_extrude9_tool2 = split(extrude(cut_extrude9_sk2.sketch, amount=-CUT_EXTRUDE9_REACH, mode=Mode.PRIVATE), bisect_by=cut_extrude9_end, keep=Keep.BOTH, mode=Mode.PRIVATE)
    # Sketch22 → Cut-Extrude9 (cut, up to the picked face)
    with BuildSketch(Plane(origin=(0, 11, 0), x_dir=(1, 0, 0), z_dir=(0, 1, 0)), mode=Mode.PRIVATE) as cut_extrude9_sk3:
        with Locations((12.5, -38)):
            Rectangle(SKETCH22_W, SKETCH22_H)
    cut_extrude9_tool3 = split(extrude(cut_extrude9_sk3.sketch, amount=-CUT_EXTRUDE9_REACH, mode=Mode.PRIVATE), bisect_by=cut_extrude9_end, keep=Keep.BOTH, mode=Mode.PRIVATE)
    # Sketch22 → Cut-Extrude9 (cut, up to the picked face)
    with BuildSketch(Plane(origin=(0, 11, 0), x_dir=(1, 0, 0), z_dir=(0, 1, 0)), mode=Mode.PRIVATE) as cut_extrude9_sk4:
        with Locations((12.5, 38)):
            Rectangle(SKETCH22_W, SKETCH22_H)
    cut_extrude9_tool4 = split(extrude(cut_extrude9_sk4.sketch, amount=-CUT_EXTRUDE9_REACH, mode=Mode.PRIVATE), bisect_by=cut_extrude9_end, keep=Keep.BOTH, mode=Mode.PRIVATE)
    add(cut_extrude9_tool1.solids().sort_by(Axis((97.5, 11, -38), (0, -1, 0)))[0], mode=Mode.SUBTRACT)
    add(cut_extrude9_tool2.solids().sort_by(Axis((97.5, 11, 38), (0, -1, 0)))[0], mode=Mode.SUBTRACT)
    add(cut_extrude9_tool3.solids().sort_by(Axis((12.5, 11, 38), (0, -1, 0)))[0], mode=Mode.SUBTRACT)
    add(cut_extrude9_tool4.solids().sort_by(Axis((12.5, 11, -38), (0, -1, 0)))[0], mode=Mode.SUBTRACT)

    # Sketch23 → Cut-Extrude10 (cut)
    with BuildSketch(Plane(origin=(0, 17, 0), x_dir=(1, 0, 0), z_dir=(0, 1, 0)).offset(CUT_EXTRUDE10_START)):
        with Locations((-165.5, 37)):
            Rectangle(SKETCH23_W, SKETCH23_H)
        with Locations((-90.5, 37)):
            Rectangle(SKETCH23_W, SKETCH23_H)
        with Locations((-90.5, -37)):
            Rectangle(SKETCH23_W, SKETCH23_H)
        with Locations((-165.5, -37)):
            Rectangle(SKETCH23_W, SKETCH23_H)
    extrude(amount=CUT_EXTRUDE10_DEPTH, mode=Mode.SUBTRACT)

    # Cut-Extrude11: up to this plane
    cut_extrude11_end = Plane(origin=(-174, 5, -172.29555299), z_dir=(-0.29732108004363994, -0.9547775528161958, 0))
    # Sketch24 → Cut-Extrude11 (cut, up to the surface)
    with BuildSketch(Plane.XZ.offset(-5), mode=Mode.PRIVATE) as cut_extrude11_sk1:
        with Locations((-165.5, 0)):
            Rectangle(SKETCH24_W, SKETCH24_H)
    cut_extrude11_tool1 = split(extrude(cut_extrude11_sk1.sketch, amount=CUT_EXTRUDE11_REACH, mode=Mode.PRIVATE), bisect_by=cut_extrude11_end, keep=Keep.BOTH, mode=Mode.PRIVATE)
    add(cut_extrude11_tool1.solids().sort_by_distance((-165.5, 5, 0))[0], mode=Mode.SUBTRACT)

    # Chamfer8
    chamfer8_edges = [part.edges().sort_by_distance(p)[0] for p in [
        (-77, 11, -22),
        (-77, 11, 23.5),
    ]]
    chamfer8_side = [part.faces().sort_by_distance(p)[0] for p in [
        (-37.089758736, 11, 0.008898276),
    ]]
    chamfer(chamfer8_edges, length=CHAMFER8_SIZE, length2=CHAMFER8_SIZE2, reference=chamfer8_side[0])


solid = part.part
